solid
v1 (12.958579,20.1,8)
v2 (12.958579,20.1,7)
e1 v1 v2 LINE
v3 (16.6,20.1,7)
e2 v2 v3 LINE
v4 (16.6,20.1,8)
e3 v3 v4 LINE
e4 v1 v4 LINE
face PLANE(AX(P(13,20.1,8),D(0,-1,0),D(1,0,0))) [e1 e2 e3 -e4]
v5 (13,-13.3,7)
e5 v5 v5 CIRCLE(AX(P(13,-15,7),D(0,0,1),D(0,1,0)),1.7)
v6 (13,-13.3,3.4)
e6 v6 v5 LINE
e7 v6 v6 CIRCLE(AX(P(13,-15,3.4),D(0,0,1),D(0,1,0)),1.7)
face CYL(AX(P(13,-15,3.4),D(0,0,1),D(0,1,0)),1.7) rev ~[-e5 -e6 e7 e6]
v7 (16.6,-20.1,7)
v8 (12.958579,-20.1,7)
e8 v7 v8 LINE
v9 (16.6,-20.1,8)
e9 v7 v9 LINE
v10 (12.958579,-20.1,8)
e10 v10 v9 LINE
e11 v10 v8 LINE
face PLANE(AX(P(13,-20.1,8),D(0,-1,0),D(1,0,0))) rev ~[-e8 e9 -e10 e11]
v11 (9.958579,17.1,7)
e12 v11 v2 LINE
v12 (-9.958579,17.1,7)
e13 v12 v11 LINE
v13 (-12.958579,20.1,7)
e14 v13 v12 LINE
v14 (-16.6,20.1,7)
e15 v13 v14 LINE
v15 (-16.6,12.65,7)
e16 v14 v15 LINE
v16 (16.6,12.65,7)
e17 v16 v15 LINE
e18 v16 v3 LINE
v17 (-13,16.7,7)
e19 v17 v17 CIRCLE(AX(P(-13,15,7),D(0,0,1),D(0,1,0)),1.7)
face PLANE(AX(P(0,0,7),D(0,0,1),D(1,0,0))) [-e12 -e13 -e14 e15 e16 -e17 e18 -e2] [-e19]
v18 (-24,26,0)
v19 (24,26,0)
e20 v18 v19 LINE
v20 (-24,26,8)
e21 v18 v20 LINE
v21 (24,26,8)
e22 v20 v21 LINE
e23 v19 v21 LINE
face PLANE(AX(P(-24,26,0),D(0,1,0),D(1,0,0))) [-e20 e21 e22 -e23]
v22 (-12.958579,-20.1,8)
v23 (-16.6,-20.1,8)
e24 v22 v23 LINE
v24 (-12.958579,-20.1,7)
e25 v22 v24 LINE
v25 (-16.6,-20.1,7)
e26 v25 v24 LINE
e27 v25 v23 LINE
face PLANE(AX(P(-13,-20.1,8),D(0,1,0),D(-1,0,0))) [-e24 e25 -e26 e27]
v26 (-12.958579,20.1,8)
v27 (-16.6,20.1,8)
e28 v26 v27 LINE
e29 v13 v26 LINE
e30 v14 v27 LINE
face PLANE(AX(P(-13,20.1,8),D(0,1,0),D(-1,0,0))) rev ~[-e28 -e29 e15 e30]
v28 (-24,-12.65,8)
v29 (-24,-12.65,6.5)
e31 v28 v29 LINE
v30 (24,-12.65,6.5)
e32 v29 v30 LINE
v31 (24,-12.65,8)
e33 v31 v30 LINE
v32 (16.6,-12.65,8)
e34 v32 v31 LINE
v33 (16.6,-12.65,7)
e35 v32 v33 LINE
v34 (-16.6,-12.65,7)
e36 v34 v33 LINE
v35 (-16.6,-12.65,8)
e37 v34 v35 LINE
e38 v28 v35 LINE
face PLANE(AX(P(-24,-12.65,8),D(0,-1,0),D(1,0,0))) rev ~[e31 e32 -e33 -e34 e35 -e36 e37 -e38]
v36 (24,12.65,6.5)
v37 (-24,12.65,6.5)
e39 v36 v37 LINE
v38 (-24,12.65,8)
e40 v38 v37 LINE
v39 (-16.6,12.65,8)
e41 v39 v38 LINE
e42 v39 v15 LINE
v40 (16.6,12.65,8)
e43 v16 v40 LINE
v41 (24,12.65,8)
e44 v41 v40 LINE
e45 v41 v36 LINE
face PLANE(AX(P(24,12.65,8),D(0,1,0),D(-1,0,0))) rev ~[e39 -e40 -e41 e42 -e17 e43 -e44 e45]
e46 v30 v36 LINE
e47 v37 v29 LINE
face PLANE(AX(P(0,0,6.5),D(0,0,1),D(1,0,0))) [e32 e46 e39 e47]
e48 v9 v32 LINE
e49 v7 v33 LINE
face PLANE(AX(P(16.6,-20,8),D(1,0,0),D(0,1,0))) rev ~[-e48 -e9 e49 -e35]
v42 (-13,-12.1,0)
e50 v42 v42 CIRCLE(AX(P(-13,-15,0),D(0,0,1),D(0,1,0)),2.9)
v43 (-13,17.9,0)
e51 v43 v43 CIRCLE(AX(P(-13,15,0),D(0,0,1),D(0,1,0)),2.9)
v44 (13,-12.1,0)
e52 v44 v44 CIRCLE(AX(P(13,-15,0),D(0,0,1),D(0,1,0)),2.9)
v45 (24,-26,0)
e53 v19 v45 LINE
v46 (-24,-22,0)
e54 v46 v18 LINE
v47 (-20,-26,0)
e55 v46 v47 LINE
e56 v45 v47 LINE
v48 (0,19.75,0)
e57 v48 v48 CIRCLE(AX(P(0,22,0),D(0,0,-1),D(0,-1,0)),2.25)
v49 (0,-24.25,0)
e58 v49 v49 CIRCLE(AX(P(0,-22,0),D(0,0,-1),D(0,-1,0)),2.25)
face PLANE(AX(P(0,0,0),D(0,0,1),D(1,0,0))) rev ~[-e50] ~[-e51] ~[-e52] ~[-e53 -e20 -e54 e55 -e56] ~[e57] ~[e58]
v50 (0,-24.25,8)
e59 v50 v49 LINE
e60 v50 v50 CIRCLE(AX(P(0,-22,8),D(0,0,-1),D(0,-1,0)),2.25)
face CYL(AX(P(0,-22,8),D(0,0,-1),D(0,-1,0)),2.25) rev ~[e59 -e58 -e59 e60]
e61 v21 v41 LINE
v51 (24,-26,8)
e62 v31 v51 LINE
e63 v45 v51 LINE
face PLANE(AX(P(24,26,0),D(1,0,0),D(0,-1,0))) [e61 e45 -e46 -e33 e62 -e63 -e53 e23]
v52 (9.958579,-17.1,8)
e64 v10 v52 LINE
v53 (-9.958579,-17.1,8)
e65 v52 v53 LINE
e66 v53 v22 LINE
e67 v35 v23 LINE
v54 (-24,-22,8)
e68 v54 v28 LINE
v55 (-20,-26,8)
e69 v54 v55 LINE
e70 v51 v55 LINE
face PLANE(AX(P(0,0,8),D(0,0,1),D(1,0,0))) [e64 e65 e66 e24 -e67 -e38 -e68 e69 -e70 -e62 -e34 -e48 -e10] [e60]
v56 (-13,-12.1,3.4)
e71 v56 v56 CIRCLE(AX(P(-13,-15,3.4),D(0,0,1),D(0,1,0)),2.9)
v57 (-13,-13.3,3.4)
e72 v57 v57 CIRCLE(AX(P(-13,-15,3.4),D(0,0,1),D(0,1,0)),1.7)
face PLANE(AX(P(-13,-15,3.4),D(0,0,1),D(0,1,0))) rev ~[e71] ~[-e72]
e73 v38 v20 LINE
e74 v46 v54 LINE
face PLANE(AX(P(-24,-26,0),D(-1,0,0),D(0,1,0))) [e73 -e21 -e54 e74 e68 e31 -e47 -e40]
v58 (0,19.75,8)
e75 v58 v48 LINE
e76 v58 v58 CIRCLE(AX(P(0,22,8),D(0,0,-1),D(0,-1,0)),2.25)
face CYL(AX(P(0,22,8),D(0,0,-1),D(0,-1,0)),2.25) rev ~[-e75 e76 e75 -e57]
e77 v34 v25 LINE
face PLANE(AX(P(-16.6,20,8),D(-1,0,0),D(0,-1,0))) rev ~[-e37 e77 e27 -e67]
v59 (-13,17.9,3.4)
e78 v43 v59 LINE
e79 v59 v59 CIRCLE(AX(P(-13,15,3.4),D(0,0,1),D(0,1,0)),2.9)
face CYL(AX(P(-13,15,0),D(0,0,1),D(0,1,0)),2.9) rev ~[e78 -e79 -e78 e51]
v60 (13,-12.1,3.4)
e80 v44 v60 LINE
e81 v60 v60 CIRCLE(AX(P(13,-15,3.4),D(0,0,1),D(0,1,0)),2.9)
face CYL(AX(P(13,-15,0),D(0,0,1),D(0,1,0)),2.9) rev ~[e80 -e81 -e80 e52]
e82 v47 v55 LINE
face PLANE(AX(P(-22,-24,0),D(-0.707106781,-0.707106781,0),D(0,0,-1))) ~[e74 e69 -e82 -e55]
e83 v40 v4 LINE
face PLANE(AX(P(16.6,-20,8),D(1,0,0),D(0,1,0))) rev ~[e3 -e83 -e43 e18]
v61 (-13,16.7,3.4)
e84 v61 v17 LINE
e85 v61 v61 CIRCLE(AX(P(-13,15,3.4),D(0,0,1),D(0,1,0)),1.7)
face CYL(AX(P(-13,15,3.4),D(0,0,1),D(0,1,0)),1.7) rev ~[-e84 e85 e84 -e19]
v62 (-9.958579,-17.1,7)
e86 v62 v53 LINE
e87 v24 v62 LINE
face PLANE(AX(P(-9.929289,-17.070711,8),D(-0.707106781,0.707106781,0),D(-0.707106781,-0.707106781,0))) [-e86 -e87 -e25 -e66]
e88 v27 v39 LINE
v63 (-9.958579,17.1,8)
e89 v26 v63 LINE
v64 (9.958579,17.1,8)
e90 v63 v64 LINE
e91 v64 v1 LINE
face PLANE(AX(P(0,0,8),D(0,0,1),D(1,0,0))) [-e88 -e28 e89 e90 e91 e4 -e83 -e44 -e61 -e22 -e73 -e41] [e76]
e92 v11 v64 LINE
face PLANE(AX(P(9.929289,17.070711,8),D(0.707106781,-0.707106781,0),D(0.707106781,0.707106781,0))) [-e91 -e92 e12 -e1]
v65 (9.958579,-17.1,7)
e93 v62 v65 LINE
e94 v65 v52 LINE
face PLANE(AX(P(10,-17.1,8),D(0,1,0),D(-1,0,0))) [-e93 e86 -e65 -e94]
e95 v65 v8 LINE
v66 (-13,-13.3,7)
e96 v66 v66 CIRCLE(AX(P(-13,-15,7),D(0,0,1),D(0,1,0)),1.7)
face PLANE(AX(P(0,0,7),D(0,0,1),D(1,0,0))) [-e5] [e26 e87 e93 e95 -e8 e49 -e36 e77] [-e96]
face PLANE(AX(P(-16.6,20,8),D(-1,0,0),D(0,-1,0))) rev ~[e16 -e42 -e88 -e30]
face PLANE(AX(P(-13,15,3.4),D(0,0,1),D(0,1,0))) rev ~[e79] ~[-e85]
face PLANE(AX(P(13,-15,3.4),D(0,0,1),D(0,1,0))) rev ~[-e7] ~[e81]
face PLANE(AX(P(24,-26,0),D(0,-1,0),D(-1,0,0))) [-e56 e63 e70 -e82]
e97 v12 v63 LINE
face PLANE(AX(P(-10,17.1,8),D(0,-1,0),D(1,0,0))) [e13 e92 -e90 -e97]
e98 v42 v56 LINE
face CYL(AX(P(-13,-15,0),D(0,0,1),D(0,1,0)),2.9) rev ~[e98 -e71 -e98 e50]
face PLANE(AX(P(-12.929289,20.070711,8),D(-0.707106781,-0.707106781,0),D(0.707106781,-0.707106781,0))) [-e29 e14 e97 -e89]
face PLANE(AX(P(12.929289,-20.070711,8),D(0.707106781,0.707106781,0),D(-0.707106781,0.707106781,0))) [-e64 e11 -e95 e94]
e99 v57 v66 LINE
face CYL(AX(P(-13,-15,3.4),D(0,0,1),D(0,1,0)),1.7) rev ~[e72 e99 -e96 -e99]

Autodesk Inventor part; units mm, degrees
ref_plane "YZ Plane" through (0, 0, 0) normal (1, 0, 0) x (0, 1, 0)
ref_plane "XZ Plane" through (0, 0, 0) normal (0, 1, 0) x (-1, 0, 0)
ref_plane "XY Plane" through (0, 0, 0) normal (0, 0, 1) x (1, 0, 0)
sketch "Sketch1" plane through (0, 0, 0) normal (0, 0, 1) x (1, 0, 0)
  line L0 (-24, 26) -> (24, 26)
  line L1 (24, 26) -> (24, -26)
  line L2 (24, -26) -> (-24, -26)
  line L3 (-24, -26) -> (-24, 26)
  line L4 (-24, 26) -> (24, -26) construction
  line L5 (24, 26) -> (-24, -26) construction
  point P0 (0, 0)
  dimension "d2" = 48
  dimension "d3" = 52
extrude "Extrusion1" add sketch "Sketch1" along normal blind 8
sketch "Sketch2" plane through (0, 0, 8) normal (0, 0, 1) x (1, 0, 0)
  line L0 (0, 22) -> (0, -22) construction
  point P0 (0, 0)
  point P1 (0, 0)
  dimension "d4" = 44
hole "Hole1" at (0, 22, 8) at (0, -22, 8) direction (0, 0, -1) diameter 4.5 depth 20 clearance for "Hex Head Cap Screw ISO 24017" size "M4" standard "ISO"
sketch "Sketch3" plane through (0, 0, 8) normal (0, 0, 1) x (1, 0, 0)
  line L0 (13, -20) -> (16.5, -20) projected
  line L1 (10, -17) -> (-10, -17) projected
  line L2 (13, 20) -> (16.5, 20) projected
  line L3 (-10, 17) -> (10, 17) projected
  line L4 (-13, 20) -> (-16.5, 20) projected
  line L5 (-13, 20) -> (-10, 17) projected
  line L6 (10, 17) -> (13, 20) projected
  line L7 (13, -20) -> (10, -17) projected
  line L8 (-10, -17) -> (-13, -20) projected
  line L9 (-13, -20) -> (-16.5, -20) projected
  circle A0 centre (0, 22) radius 2.25 construction
  circle A1 centre (0, -22) radius 2.25 construction
  line L10 (-24, -26) -> (24, -26) construction
  line L11 (24, -26) -> (24, 26) construction
  line L12 (24, 26) -> (-24, 26) construction
  line L13 (-24, 26) -> (-24, -26) construction
  line L14 (16.5, -20) -> (16.5, 20)
  line L15 (-16.5, 20) -> (-16.5, -20)
  point P0 (0, 0)
extrude "Extrusion2" cut sketch "Sketch3" against normal blind 0.9
sketch "Sketch4" plane through (0, 0, 0) normal (0, 0, -1) x (-1, 0, 0)
  line L0 (-13, -15) -> (13, -15) construction
  line L1 (13, -15) -> (13, 15) construction
  line L2 (13, 15) -> (-13, 15) construction
  line L3 (-13, 15) -> (-13, -15) construction
  line L4 (-13, -15) -> (13, 15) construction
  line L5 (13, -15) -> (-13, 15) construction
  point P0 (0, 0)
  dimension "d16" = 26
  dimension "d17" = 30
hole "Hole2" at (-13, 15, 0) at (-13, -15, 0) at (13, -15, 0) direction (0, 0, 1) diameter 3.4 end through all counterbore diameter 5.8 counterbore depth 3.4 clearance for "Socket Head Cap Screw ISO 4762" size "M3" standard "ISO"
chamfer "Chamfer1" distance 4 angle 45 1 edges at (-24, -26, 4)
thicken "Thicken1" operation cut thickness 0.1 both sides no extend neighbours no toward (0, 1, 0) faces at (-14.1667, 20, 7.7) (-11, 18, 7.7) (3.3333, 17, 7.4) (12, 19, 7.7) (15.3333, 20, 7.7) (11, -18, 7.7) (14.1667, -20, 7.7) (-3.3333, -17, 7.7) (-15.3333, -20, 7.7) (-12, -19, 7.7) (3.3333, 5.6667, 7.1) (16.5, -6.6667, 7.7) (-16.5, 6.6667, 7.7)
sketch "Sketch5" plane through (0, 0, 8) normal (0, 0, 1) x (1, 0, 0)
  line L0 (24, 12.65) -> (-24, 12.65)
  line L1 (-24, 12.65) -> (-24, -12.65)
  line L2 (-24, -12.65) -> (24, -12.65)
  line L3 (24, -12.65) -> (24, 12.65)
  line L4 (24, 12.65) -> (-24, -12.65) construction
  line L5 (-24, 12.65) -> (24, -12.65) construction
  line L6 (24, -26) -> (24, 26) construction
  point P0 (0, 0)
  dimension "d28" = 25.3
extrude "Extrusion3" cut sketch "Sketch5" against normal blind 1.5
properties part number "ChamberMount_c"
